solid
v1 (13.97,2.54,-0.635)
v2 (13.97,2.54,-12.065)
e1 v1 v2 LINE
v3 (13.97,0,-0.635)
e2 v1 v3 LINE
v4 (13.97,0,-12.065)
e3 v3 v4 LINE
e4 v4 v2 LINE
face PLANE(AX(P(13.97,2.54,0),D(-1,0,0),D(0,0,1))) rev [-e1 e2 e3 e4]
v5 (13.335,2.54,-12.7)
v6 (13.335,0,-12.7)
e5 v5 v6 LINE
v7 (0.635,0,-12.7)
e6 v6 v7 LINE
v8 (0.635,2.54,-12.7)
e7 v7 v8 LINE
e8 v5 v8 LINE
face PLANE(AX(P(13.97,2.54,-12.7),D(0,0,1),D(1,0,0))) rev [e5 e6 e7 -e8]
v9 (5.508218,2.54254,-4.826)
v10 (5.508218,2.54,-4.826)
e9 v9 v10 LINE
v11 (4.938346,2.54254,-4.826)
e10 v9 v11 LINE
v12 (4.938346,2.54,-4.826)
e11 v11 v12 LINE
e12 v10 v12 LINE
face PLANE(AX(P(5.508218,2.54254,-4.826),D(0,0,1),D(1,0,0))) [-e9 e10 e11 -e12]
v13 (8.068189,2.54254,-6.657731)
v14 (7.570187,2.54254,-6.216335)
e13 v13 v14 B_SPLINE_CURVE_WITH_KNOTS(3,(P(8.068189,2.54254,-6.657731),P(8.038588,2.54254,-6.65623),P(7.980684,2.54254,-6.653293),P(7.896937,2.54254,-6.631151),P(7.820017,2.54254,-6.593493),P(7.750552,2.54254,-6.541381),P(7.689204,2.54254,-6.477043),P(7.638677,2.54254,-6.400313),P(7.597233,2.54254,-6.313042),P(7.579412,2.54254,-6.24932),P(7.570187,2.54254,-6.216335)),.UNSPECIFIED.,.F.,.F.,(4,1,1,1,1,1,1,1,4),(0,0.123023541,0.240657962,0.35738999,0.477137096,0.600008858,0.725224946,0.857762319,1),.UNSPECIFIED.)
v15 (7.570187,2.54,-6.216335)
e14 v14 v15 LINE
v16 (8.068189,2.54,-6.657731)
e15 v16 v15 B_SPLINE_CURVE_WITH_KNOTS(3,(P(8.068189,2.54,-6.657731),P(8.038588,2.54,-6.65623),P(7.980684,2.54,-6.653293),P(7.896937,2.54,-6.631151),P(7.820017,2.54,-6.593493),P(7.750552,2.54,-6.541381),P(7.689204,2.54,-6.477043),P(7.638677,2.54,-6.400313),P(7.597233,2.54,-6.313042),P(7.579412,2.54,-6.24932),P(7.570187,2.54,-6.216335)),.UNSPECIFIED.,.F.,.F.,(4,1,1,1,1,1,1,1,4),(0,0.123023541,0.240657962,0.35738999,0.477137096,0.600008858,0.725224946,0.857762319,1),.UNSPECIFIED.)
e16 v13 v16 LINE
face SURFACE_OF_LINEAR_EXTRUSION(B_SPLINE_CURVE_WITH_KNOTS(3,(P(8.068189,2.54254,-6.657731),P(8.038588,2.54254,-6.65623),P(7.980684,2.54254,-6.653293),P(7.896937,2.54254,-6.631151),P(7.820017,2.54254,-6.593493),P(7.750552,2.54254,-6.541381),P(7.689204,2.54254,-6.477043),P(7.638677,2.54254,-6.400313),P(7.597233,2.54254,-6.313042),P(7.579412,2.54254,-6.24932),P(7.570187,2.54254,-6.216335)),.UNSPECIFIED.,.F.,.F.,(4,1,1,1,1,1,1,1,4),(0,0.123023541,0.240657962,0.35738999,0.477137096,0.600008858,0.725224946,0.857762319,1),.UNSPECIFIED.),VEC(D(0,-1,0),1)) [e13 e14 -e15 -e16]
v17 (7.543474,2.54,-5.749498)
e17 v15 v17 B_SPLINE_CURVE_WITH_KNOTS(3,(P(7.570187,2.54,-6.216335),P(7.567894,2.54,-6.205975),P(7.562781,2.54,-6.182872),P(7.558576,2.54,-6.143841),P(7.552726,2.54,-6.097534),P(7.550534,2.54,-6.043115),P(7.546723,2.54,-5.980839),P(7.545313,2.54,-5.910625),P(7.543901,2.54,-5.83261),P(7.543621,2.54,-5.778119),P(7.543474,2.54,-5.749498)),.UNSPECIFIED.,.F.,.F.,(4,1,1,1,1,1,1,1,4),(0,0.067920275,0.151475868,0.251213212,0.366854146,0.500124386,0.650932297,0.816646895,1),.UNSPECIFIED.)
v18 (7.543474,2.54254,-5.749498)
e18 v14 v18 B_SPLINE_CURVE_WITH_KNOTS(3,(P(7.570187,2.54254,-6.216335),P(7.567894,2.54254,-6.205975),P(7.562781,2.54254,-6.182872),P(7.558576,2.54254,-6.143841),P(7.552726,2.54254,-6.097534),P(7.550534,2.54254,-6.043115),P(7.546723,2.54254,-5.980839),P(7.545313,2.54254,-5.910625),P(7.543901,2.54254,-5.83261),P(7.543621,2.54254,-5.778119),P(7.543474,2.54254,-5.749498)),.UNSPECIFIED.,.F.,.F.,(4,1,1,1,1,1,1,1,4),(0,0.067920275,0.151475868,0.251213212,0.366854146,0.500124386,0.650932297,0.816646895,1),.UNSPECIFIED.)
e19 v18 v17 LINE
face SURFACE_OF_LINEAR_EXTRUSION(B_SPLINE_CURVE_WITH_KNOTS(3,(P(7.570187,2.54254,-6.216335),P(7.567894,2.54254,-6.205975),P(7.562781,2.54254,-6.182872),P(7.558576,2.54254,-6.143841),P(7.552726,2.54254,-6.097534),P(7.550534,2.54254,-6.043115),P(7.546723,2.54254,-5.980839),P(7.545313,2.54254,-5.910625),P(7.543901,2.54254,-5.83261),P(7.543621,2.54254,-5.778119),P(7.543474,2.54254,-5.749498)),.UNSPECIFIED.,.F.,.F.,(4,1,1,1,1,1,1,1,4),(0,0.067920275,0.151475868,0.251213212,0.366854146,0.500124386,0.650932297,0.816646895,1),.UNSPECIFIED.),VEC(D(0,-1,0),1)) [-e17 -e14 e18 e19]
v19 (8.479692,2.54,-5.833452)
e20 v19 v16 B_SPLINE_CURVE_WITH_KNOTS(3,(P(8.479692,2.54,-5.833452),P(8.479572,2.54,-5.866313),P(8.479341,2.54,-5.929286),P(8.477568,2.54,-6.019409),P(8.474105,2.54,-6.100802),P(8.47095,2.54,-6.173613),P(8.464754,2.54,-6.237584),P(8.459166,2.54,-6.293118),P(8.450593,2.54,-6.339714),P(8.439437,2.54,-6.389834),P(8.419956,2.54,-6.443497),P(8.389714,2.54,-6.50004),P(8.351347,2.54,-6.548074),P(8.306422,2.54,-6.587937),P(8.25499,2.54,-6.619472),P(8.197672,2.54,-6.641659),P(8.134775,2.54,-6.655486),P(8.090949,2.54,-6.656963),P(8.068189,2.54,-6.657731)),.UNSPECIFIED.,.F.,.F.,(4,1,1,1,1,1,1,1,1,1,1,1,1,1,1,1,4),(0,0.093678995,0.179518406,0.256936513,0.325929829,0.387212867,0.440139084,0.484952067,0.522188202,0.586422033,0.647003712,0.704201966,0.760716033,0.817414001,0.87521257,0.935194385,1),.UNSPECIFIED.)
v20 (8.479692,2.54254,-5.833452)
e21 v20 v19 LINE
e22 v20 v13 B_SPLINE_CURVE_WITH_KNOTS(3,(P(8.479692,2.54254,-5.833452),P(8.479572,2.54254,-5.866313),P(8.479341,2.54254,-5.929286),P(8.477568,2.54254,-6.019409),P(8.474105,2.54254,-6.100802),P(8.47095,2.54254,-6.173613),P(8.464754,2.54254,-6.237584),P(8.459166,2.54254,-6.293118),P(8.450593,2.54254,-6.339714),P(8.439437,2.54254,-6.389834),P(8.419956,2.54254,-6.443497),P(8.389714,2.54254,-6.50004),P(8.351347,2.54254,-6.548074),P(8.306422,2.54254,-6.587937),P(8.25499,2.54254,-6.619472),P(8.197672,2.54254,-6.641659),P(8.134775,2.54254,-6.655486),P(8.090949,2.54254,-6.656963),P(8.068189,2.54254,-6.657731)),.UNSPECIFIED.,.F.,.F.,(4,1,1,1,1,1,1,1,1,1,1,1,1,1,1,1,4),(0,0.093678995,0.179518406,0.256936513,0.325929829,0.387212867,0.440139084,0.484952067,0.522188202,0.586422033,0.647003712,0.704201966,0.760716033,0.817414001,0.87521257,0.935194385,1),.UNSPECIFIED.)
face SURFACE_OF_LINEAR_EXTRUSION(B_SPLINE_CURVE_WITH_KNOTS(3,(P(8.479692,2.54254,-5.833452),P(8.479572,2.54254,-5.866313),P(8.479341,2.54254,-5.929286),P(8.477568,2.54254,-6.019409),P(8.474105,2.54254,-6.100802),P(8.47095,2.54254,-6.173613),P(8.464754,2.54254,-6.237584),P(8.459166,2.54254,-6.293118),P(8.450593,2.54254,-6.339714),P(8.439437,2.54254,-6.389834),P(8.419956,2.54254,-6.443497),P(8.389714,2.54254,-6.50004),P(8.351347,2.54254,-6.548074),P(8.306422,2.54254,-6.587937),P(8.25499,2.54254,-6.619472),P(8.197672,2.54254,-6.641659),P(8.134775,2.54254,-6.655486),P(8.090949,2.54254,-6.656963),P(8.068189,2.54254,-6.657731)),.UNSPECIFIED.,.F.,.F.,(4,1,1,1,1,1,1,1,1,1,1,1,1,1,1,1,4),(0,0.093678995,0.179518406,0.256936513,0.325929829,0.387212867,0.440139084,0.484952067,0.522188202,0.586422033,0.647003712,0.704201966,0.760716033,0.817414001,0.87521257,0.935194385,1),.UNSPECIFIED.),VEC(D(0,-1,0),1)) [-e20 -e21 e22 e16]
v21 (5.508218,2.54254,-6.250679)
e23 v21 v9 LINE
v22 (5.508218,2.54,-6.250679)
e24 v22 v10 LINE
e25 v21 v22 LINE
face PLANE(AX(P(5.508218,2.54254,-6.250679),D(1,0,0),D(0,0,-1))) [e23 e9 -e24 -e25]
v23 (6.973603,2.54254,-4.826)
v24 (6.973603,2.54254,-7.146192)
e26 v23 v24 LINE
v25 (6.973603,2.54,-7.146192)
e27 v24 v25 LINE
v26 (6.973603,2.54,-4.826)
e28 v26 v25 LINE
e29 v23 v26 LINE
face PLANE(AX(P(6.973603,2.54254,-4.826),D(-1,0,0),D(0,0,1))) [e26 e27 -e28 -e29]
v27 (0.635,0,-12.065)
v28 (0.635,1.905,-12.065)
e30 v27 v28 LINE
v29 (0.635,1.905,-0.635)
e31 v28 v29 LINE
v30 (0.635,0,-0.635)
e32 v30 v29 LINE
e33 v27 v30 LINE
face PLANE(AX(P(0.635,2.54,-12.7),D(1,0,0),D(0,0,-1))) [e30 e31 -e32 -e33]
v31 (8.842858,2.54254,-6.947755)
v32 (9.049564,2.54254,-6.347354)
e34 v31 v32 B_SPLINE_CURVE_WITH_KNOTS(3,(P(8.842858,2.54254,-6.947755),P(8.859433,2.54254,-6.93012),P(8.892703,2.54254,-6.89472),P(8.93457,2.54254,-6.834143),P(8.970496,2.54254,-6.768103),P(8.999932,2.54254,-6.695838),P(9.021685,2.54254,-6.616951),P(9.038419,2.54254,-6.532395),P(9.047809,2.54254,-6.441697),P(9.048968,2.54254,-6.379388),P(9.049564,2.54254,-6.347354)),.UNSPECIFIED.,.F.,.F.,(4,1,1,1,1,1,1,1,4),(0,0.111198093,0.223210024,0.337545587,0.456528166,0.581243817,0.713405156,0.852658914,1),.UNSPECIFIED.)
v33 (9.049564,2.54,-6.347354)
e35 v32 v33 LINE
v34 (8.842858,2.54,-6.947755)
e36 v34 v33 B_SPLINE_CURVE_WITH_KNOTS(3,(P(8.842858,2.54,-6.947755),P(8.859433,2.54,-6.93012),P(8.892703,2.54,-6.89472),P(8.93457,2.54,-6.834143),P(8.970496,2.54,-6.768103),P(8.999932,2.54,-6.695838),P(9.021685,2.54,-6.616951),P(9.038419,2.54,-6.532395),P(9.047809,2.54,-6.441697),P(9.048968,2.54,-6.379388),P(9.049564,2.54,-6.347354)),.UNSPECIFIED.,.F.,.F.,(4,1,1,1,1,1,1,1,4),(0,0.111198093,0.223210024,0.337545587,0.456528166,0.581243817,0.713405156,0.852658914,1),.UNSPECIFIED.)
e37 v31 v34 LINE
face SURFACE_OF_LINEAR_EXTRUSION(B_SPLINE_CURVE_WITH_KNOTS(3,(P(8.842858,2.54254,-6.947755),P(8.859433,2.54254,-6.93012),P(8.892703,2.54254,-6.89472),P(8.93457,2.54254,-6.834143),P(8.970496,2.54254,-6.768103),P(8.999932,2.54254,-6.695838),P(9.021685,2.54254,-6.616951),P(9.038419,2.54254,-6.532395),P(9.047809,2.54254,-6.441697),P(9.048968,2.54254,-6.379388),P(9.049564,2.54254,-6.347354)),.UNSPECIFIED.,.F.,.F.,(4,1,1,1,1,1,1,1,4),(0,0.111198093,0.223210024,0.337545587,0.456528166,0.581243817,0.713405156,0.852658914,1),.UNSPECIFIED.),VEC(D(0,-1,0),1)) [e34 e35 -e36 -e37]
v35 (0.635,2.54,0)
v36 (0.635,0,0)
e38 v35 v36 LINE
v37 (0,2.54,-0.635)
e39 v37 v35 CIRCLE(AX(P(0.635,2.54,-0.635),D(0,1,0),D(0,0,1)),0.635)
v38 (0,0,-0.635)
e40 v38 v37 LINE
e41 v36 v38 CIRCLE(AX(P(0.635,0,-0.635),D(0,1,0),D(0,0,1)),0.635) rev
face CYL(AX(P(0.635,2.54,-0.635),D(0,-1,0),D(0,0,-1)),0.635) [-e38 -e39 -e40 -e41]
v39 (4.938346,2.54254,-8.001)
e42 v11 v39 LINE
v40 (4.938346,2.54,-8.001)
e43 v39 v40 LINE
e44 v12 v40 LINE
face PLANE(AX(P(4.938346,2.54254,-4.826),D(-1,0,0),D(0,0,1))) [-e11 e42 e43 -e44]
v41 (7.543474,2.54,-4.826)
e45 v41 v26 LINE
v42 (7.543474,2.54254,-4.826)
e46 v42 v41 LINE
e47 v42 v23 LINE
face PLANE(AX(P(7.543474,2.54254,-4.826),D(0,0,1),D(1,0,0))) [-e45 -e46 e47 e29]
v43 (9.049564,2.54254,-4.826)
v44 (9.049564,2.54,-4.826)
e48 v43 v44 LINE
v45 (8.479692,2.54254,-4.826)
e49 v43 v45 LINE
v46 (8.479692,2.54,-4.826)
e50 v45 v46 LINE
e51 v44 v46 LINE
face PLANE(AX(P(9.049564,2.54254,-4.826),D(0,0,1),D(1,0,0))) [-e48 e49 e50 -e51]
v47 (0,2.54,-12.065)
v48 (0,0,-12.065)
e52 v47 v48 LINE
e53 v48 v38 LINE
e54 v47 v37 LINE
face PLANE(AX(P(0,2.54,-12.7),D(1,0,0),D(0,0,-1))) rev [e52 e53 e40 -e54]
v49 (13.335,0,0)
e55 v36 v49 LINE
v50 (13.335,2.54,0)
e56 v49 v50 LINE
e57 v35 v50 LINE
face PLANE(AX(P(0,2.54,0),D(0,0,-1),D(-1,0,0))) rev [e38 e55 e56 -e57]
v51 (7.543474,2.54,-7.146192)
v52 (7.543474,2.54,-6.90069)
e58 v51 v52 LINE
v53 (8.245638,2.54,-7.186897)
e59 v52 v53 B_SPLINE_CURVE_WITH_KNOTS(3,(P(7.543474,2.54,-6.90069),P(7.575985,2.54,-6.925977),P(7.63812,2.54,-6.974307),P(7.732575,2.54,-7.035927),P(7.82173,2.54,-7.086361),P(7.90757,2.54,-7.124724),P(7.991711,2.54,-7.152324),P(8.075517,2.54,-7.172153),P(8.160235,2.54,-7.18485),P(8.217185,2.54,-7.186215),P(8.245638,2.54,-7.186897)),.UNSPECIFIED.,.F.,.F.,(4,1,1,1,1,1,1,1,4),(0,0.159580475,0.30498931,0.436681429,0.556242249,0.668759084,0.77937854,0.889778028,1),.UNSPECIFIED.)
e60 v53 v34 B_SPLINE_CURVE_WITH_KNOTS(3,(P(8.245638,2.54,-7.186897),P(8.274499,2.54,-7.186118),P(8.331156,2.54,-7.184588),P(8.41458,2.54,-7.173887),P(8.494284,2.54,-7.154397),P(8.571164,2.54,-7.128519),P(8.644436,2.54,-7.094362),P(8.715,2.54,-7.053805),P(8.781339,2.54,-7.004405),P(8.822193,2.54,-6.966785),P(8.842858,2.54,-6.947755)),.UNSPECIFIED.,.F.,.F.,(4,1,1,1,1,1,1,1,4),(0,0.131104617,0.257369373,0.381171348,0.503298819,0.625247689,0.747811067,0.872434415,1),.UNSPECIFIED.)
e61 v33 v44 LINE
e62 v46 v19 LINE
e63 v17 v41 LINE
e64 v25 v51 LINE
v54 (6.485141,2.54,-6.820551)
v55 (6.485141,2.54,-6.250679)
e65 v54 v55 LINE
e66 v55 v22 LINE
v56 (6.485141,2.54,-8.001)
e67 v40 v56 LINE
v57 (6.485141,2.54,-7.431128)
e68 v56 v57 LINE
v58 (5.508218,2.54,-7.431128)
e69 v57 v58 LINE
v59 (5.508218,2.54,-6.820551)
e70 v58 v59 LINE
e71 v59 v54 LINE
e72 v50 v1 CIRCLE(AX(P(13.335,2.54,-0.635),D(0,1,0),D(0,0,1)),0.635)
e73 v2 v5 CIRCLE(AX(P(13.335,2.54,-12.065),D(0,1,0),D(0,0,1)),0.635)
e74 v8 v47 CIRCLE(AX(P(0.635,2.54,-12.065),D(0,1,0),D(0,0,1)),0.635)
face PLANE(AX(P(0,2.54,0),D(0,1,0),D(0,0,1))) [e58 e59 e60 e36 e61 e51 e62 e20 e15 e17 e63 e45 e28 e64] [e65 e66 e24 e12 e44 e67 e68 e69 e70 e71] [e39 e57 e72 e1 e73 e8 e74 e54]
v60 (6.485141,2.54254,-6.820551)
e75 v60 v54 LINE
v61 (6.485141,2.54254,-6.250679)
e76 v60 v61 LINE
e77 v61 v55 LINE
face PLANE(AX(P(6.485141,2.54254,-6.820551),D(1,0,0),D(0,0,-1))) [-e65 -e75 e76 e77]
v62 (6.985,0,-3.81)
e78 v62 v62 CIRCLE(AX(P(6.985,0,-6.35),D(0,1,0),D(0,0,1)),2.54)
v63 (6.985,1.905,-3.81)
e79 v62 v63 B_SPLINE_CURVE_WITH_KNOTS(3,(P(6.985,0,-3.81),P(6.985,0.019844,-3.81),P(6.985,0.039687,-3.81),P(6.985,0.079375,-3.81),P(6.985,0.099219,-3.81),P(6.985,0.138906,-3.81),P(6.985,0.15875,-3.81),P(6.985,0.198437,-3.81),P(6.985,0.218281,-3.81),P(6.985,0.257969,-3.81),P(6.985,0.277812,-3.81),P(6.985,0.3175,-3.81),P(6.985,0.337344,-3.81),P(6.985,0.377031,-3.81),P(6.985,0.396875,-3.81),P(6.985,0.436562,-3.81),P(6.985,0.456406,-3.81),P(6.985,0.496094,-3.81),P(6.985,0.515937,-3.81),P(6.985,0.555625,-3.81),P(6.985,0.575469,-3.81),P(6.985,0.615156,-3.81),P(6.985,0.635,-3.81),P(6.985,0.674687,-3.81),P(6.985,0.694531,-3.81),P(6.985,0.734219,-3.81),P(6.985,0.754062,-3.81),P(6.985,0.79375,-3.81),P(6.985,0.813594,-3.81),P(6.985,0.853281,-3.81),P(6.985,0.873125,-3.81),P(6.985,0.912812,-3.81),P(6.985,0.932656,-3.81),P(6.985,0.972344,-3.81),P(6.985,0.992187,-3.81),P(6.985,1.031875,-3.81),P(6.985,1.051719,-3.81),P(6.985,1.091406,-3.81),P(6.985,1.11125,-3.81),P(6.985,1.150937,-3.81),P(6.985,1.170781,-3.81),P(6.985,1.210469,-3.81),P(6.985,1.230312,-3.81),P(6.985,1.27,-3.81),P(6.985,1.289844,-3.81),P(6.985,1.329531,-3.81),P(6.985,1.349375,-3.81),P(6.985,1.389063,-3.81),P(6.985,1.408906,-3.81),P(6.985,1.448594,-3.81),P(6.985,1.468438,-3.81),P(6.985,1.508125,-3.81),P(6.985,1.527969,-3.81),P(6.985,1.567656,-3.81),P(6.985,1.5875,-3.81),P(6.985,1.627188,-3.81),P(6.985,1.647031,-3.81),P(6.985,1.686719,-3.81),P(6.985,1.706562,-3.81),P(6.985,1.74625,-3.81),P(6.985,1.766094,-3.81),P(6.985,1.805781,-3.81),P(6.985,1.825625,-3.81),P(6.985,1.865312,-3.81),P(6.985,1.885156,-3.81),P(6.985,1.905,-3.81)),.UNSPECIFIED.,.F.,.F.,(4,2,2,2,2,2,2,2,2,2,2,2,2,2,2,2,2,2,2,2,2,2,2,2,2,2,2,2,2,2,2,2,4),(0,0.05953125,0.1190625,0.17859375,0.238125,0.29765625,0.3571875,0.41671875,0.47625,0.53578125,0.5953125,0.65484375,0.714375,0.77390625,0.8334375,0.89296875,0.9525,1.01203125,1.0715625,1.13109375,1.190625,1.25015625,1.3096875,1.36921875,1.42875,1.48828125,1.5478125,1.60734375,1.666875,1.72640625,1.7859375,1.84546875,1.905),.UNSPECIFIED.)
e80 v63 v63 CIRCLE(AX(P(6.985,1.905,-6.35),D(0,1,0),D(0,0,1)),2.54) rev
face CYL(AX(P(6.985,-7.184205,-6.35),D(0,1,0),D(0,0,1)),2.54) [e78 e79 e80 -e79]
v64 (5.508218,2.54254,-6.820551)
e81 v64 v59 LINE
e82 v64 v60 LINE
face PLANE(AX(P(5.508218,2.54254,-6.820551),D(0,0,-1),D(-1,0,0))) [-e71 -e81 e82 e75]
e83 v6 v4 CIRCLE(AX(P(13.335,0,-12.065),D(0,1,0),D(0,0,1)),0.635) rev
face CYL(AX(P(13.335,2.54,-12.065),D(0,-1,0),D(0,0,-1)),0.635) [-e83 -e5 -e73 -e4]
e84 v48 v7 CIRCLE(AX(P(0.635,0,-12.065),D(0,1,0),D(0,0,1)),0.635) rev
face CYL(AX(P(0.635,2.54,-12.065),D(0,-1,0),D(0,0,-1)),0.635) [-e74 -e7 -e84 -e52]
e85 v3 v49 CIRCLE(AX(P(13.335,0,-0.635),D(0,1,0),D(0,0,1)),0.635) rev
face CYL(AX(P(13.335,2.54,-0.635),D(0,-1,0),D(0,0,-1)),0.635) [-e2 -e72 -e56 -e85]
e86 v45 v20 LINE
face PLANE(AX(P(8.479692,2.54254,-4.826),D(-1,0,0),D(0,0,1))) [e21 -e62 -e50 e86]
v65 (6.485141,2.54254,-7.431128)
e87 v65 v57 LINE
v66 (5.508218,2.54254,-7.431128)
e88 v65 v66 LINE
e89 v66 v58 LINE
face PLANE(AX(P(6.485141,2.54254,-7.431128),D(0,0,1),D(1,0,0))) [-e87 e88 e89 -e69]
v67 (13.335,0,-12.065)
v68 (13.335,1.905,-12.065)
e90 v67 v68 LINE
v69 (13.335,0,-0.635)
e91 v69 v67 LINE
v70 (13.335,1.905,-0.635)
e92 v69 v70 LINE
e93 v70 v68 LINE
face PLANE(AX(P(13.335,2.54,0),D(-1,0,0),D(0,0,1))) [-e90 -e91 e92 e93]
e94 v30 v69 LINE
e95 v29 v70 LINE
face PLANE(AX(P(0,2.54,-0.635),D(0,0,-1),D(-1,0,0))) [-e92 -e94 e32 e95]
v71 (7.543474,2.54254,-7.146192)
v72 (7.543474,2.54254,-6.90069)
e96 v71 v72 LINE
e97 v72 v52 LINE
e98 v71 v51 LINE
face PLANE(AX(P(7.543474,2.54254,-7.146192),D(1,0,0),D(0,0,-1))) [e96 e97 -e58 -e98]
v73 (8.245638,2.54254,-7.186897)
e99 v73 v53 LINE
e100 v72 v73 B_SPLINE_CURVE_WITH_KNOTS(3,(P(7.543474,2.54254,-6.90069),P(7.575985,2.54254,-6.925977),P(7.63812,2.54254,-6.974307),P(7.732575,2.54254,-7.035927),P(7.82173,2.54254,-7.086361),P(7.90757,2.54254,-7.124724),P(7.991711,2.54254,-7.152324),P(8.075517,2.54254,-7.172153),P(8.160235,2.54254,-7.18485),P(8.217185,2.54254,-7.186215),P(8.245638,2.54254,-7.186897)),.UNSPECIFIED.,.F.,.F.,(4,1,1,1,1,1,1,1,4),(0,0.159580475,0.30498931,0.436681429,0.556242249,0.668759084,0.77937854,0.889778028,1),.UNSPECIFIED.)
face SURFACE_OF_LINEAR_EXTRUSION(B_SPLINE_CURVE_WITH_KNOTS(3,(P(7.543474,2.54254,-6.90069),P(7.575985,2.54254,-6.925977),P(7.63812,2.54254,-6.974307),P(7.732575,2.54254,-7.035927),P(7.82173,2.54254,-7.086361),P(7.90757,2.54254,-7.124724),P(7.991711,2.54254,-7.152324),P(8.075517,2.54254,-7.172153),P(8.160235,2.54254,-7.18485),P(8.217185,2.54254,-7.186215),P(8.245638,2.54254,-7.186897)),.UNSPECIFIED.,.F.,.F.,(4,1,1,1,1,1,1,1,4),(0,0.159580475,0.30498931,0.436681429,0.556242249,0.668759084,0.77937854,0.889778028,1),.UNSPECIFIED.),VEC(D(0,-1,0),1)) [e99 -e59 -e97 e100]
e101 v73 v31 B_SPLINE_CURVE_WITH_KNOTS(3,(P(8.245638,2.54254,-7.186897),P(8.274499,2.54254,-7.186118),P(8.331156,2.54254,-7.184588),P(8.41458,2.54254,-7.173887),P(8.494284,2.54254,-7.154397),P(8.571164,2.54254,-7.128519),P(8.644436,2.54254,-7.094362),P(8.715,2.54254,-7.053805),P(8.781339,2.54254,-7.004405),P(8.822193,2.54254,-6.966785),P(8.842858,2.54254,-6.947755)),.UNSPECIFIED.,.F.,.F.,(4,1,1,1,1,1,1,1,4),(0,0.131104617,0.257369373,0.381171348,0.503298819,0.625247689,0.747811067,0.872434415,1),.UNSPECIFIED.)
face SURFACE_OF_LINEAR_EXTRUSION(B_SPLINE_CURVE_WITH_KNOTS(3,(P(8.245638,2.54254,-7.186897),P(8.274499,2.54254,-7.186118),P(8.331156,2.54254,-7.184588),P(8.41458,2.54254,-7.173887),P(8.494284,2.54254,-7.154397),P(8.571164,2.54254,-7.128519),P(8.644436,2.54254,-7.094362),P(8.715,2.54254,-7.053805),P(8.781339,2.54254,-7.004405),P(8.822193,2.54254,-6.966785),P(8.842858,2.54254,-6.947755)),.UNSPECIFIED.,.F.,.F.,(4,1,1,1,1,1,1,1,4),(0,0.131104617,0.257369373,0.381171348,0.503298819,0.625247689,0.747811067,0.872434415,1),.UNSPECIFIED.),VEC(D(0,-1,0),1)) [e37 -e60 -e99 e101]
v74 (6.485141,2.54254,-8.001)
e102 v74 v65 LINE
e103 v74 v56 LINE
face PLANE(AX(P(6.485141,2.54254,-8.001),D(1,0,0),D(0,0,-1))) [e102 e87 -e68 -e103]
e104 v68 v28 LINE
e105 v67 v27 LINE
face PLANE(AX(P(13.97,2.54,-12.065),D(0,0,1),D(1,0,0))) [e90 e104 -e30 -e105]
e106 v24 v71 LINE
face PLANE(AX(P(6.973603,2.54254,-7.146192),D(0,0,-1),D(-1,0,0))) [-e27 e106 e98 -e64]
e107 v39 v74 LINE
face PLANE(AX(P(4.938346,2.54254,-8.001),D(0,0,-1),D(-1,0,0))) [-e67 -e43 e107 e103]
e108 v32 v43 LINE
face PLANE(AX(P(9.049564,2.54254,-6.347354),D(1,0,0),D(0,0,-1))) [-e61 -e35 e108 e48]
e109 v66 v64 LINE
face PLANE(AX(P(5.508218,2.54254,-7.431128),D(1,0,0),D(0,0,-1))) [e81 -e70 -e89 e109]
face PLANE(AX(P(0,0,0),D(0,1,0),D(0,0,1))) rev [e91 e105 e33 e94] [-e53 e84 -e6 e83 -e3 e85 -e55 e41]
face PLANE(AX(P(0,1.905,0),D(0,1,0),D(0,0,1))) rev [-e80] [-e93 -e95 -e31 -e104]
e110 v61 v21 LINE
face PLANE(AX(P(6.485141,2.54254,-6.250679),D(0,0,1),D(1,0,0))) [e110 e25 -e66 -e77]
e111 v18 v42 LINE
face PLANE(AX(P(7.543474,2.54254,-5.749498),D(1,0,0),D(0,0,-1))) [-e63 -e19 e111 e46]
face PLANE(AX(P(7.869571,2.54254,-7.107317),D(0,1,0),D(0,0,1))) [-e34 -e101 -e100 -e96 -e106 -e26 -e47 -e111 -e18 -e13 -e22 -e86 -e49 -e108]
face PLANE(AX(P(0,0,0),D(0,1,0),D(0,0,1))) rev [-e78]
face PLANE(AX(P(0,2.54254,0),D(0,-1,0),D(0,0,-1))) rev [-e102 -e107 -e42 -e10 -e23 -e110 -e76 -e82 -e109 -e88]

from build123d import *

# Parameters (mm, degrees)
SKETCH1_W           = 13.97
SKETCH1_H           = 12.7
BOSS_EXTRUDE1_DEPTH = 2.54
FILLET1_R           = 0.635
SHELL1_START        = 0.635
SHELL1_OUTLINE_W    = 1.905
SHELL1_OUTLINE_H    = 11.43
SHELL1_DEPTH        = 12.7
SKETCH2_R           = 2.54
BOSS_EXTRUDE2_DEPTH = 1.905
BOSS_EXTRUDE3_DEPTH = 0.00254


# Read off the part's stored shape, not the designer's step: Shell1
with BuildPart() as part:
    # Sketch1 → Boss-Extrude1 (new body)
    with BuildSketch(Plane(origin=(0, 0, 0), x_dir=(1, 0, 0), z_dir=(0, 1, 0))):
        with Locations((6.985, 6.35)):
            Rectangle(SKETCH1_W, SKETCH1_H)
    extrude(amount=BOSS_EXTRUDE1_DEPTH)

    # Fillet1
    fillet1_edges = [part.edges().sort_by_distance(p)[0] for p in [
        (0, 1.27, -12.7),
        (13.97, 1.27, -12.7),
        (13.97, 1.27, 0),
        (0, 1.27, 0),
    ]]
    fillet(fillet1_edges, radius=FILLET1_R)

    # Shell1 outline → Shell1 (cut)
    with BuildSketch(Plane.YZ.offset(SHELL1_START)):
        with Locations((0.9525, -6.35)):
            Rectangle(SHELL1_OUTLINE_W, SHELL1_OUTLINE_H)
    extrude(amount=SHELL1_DEPTH, mode=Mode.SUBTRACT)

    # Sketch2 → Boss-Extrude2 (add)
    with BuildSketch(Plane(origin=(0, 1.905, 0), x_dir=(-1, 0, 0), z_dir=(0, -1, 0))):
        with Locations(Location((-6.985, 6.35, 0), (0, 0, 270))):
            Circle(SKETCH2_R)
    extrude(amount=BOSS_EXTRUDE2_DEPTH)

    # Sketch3 → Boss-Extrude3 (add)
    with BuildSketch(Plane(origin=(0, 2.54, 0), x_dir=(1, 0, 0), z_dir=(0, 1, 0))):
        Polygon((4.938346154, 8.001), (6.485141026, 8.001), (6.485141026, 7.431128205), (5.508217949, 7.431128205), (5.508217949, 6.820551282), (6.485141026, 6.820551282), (6.485141026, 6.250679487), (5.508217949, 6.250679487), (5.508217949, 4.826), (4.938346154, 4.826), align=None)
        with BuildLine():
            Line((6.973602564, 7.146192308), (7.543474359, 7.146192308))
            Line((7.543474359, 7.146192308), (7.543474359, 6.900689503))
            add(Edge.make_bspline(
                [(7.543474359, 6.900689503), (7.575985262, 6.925977153), (7.638119919, 6.974306769), (7.732575324, 7.035927275), (7.821729533, 7.086361185), (7.907569887, 7.124723797), (7.991711475, 7.152324047), (8.075517031, 7.172153181), (8.160234588, 7.18485032), (8.217185351, 7.18621543), (8.245637821, 7.186897436)],
                knots=[0, 0, 0, 0, 1.276643801, 2.439914479, 3.493451431, 4.44993799, 5.350072675, 6.235028322, 7.118224225, 8, 8, 8, 8], degree=3))
            add(Edge.make_bspline(
                [(8.245637821, 7.186897436), (8.274499022, 7.186118044), (8.331155985, 7.184588033), (8.41458024, 7.173886845), (8.494284014, 7.154396591), (8.57116351, 7.128518806), (8.644436227, 7.094361613), (8.714999799, 7.053805489), (8.781338547, 7.004405385), (8.822192885, 6.966784638), (8.842858373, 6.947754808)],
                knots=[0, 0, 0, 0, 1.048836932, 2.058954983, 3.049370783, 4.026390553, 5.001981509, 5.982488534, 6.97947532, 8, 8, 8, 8], degree=3))
            add(Edge.make_bspline(
                [(8.842858373, 6.947754808), (8.859432856, 6.93011972), (8.892703126, 6.894720476), (8.934569582, 6.834143303), (8.970495709, 6.768103097), (8.999932179, 6.695838062), (9.021684544, 6.616951149), (9.038418936, 6.532395199), (9.047808895, 6.441696762), (9.048968129, 6.379387791), (9.049564103, 6.347354167)],
                knots=[0, 0, 0, 0, 0.889584746, 1.785680191, 2.700364693, 3.65222533, 4.649950538, 5.707241244, 6.821271309, 8, 8, 8, 8], degree=3))
            Line((9.049564103, 6.347354167), (9.049564103, 4.826))
            Line((9.049564103, 4.826), (8.479692308, 4.826))
            Line((8.479692308, 4.826), (8.479692308, 5.833451923))
            add(Edge.make_bspline(
                [(8.479692308, 5.833451923), (8.479571792, 5.86631325), (8.479340847, 5.929285883), (8.477567699, 6.019409185), (8.474105481, 6.10080223), (8.470949759, 6.173613213), (8.464753823, 6.237583603), (8.459166228, 6.293118384), (8.450592604, 6.339713739), (8.439436929, 6.389834035), (8.419956373, 6.443496978), (8.38971376, 6.500039753), (8.351346764, 6.548074101), (8.306422447, 6.587936766), (8.254990424, 6.619471791), (8.197672176, 6.641658645), (8.134774997, 6.655486038), (8.090948982, 6.656963488), (8.068188902, 6.657730769)],
                knots=[0, 0, 0, 0, 1.49886392, 2.872294502, 4.110984203, 5.214877267, 6.195405875, 7.042225351, 7.75923308, 8.355011229, 9.382752534, 10.352059385, 11.267231453, 12.171456522, 13.078624015, 14.003401117, 14.963110155, 16, 16, 16, 16], degree=3))
            add(Edge.make_bspline(
                [(8.068188902, 6.657730769), (8.038588461, 6.656229723), (7.980684244, 6.653293385), (7.896937378, 6.631150715), (7.820017276, 6.593492551), (7.75055244, 6.541381225), (7.689204465, 6.477043335), (7.638676644, 6.400313021), (7.597233451, 6.313042165), (7.579412262, 6.249320264), (7.570187099, 6.216334535)],
                knots=[0, 0, 0, 0, 0.984188326, 1.925263693, 2.85911992, 3.81709677, 4.80007086, 5.801799564, 6.862098548, 8, 8, 8, 8], degree=3))
            add(Edge.make_bspline(
                [(7.570187099, 6.216334535), (7.56789428, 6.205975146), (7.562780832, 6.182871626), (7.558575667, 6.143840753), (7.552725978, 6.097534401), (7.550534244, 6.043114556), (7.546723058, 5.980838765), (7.5453135, 5.910624637), (7.543901419, 5.83260985), (7.543621428, 5.778119486), (7.543474359, 5.749497596)],
                knots=[0, 0, 0, 0, 0.543362196, 1.211806945, 2.009705693, 2.934833164, 4.000995085, 5.207458376, 6.533175157, 8, 8, 8, 8], degree=3))
            Line((7.543474359, 5.749497596), (7.543474359, 4.826))
            Line((7.543474359, 4.826), (6.973602564, 4.826))
            Line((6.973602564, 4.826), (6.973602564, 7.146192308))
        make_face()
    extrude(amount=BOSS_EXTRUDE3_DEPTH)


solid = part.part
